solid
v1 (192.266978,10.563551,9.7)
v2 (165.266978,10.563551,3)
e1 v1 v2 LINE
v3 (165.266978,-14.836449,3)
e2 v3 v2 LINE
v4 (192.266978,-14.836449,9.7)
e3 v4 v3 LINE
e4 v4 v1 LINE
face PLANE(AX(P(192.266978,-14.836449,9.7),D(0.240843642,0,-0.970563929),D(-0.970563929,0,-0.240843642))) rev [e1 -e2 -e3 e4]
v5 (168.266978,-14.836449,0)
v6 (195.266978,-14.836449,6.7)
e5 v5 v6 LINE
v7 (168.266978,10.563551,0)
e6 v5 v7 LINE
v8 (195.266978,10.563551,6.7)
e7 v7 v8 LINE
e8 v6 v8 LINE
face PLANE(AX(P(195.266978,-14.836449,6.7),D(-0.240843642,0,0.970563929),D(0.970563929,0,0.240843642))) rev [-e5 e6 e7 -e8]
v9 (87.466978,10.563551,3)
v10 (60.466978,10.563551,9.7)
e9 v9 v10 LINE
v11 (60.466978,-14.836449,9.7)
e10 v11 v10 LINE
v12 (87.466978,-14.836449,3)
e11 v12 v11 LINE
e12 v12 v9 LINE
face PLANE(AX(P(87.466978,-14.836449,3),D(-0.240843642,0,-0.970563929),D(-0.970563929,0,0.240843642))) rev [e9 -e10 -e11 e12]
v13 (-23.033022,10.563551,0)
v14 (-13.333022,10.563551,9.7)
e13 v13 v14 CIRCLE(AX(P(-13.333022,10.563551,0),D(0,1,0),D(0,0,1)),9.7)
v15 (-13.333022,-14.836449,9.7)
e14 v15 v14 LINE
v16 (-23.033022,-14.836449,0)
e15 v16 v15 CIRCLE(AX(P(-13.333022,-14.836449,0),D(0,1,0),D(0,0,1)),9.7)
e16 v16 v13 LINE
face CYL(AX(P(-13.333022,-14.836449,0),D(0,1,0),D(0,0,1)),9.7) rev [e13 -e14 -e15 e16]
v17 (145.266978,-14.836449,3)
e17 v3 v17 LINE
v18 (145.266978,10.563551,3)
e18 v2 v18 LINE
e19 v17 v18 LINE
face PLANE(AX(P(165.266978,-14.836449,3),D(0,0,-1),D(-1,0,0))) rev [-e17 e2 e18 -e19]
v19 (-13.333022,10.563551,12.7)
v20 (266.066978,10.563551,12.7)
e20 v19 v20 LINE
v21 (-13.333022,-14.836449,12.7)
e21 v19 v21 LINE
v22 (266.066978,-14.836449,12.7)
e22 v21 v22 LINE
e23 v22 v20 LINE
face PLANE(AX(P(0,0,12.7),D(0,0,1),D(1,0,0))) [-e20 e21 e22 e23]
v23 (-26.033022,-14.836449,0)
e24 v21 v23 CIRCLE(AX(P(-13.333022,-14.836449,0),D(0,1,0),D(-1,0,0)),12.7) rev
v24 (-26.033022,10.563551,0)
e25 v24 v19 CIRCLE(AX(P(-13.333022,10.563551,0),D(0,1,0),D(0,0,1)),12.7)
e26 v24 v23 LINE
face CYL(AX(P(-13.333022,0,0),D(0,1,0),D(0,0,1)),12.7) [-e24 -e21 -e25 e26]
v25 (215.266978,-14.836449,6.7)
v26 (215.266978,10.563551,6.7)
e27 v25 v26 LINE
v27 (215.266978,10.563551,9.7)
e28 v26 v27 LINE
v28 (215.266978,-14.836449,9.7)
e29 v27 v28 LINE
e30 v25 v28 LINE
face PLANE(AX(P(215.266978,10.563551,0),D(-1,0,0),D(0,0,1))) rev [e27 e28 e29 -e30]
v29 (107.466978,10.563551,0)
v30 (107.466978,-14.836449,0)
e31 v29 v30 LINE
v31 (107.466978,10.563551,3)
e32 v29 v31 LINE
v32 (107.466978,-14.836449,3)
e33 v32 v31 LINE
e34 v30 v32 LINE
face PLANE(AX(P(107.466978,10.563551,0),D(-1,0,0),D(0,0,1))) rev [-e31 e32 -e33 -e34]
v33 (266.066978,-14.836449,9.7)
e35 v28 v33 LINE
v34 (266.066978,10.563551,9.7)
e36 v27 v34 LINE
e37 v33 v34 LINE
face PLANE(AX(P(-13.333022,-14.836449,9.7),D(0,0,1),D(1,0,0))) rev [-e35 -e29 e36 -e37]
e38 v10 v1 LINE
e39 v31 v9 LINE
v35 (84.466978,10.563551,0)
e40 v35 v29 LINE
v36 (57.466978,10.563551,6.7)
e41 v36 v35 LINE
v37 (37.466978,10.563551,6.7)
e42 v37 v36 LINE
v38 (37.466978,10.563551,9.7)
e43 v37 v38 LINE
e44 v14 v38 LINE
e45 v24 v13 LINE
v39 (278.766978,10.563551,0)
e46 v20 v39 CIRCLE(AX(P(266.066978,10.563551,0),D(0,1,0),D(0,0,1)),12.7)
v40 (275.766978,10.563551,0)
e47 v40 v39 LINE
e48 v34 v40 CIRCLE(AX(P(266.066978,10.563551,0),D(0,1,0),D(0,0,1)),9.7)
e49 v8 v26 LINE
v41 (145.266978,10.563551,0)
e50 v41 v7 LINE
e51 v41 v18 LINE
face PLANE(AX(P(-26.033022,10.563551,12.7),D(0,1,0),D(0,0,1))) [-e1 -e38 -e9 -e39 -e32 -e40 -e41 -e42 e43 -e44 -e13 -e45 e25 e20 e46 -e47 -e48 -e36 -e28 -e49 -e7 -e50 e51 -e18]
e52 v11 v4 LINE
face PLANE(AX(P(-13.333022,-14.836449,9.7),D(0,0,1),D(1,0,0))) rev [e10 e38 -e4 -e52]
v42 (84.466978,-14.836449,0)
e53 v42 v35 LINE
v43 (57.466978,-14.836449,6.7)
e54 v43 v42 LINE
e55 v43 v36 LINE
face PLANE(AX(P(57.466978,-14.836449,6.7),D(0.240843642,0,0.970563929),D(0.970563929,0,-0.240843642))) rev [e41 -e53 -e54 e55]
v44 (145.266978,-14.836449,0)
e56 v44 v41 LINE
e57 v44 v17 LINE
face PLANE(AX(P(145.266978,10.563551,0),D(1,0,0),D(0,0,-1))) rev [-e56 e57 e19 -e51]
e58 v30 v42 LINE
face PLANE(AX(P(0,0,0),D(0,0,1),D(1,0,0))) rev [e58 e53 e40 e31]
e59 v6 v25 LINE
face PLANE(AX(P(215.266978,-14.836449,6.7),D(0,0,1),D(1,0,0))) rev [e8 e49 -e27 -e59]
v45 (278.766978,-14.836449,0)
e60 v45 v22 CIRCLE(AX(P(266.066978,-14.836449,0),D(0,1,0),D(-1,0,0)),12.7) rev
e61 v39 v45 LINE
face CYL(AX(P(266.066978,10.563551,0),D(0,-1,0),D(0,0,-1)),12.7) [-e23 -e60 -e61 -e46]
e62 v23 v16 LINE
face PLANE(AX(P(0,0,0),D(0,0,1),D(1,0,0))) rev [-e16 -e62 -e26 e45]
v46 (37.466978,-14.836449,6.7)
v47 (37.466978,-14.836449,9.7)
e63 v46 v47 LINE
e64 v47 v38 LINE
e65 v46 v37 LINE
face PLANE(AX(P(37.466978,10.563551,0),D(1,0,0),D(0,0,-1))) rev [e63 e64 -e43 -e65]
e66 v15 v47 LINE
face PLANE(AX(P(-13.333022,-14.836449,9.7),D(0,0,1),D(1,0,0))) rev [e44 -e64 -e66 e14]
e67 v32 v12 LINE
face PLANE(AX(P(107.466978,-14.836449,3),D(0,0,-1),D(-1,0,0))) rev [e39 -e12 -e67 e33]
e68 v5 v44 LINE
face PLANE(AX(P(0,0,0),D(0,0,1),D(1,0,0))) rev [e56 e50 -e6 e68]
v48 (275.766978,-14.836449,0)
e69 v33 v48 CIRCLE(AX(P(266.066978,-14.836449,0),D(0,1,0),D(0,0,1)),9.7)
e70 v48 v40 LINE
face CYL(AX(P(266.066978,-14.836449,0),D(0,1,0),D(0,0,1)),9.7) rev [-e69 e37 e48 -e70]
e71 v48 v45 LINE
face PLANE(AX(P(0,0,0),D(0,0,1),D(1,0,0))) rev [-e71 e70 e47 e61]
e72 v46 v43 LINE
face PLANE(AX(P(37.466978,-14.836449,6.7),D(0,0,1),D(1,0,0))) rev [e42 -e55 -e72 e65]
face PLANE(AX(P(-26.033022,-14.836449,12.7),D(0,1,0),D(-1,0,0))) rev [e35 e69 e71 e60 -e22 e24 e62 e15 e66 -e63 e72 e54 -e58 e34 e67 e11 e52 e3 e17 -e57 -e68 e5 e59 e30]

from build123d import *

# Parameters (mm, degrees)
SKETCH1_W           = 304.8
SKETCH1_H           = 25.4
BOSS_EXTRUDE2_DEPTH = 12.7
FILLET1_R           = 12.7
CUT_EXTRUDE3_DEPTH  = 281.209703849
SKETCH8_W           = 70
SKETCH8_H           = 25.4
BOSS_EXTRUDE3_DEPTH = 9.7
CUT_EXTRUDE4_DEPTH  = 281.209703849
CUT_EXTRUDE5_DEPTH  = 281.209703849


with BuildPart() as part:
    # Sketch1 → Boss-Extrude2 (new body)
    with BuildSketch(Plane.XY):
        with Locations((126.366978193, -2.136448598)):
            Rectangle(SKETCH1_W, SKETCH1_H)
    extrude(amount=BOSS_EXTRUDE2_DEPTH)

    # Fillet1
    fillet1_edges = [part.edges().sort_by_distance(p)[0] for p in [
        (-26.033021807, -2.136448598, 12.7),
        (278.766978193, -2.136448598, 12.7),
    ]]
    fillet(fillet1_edges, radius=FILLET1_R - 0.0001)  # a hair under: the kernel refuses the full size

    # Sketch6 → Cut-Extrude3 (cut, through all)
    with BuildSketch(Plane(origin=(0, 10.563551402, 0), x_dir=(1, 0, 0), z_dir=(0, 1, 0))):
        with BuildLine():
            Line((-23.033021807, 0), (275.766978193, 0))
            ThreePointArc((275.766978193, 0), (272.925913971, -6.858935778), (266.066978193, -9.7))
            Line((266.066978193, -9.7), (-13.333021807, -9.7))
            ThreePointArc((-13.333021807, -9.7), (-20.191957584, -6.858935778), (-23.033021807, 0))
        make_face()
    extrude(amount=-CUT_EXTRUDE3_DEPTH, mode=Mode.SUBTRACT)

    # Sketch8 → Boss-Extrude3 (add)
    with BuildSketch(Plane(origin=(0, 0, 9.7), x_dir=(-1, 0, 0), z_dir=(0, 0, -1))):
        with Locations((-180.266978193, -2.136448598)):
            Rectangle(SKETCH8_W, SKETCH8_H)
        with Locations((-72.466978193, -2.136448598)):
            Rectangle(SKETCH8_W, SKETCH8_H)
    extrude(amount=BOSS_EXTRUDE3_DEPTH)

    # Sketch9 → Cut-Extrude4 (cut, through all)
    with BuildSketch(Plane(origin=(0, 10.563551402, 0), x_dir=(1, 0, 0), z_dir=(0, 1, 0))):
        Polygon((145.266978193, -9.7), (165.266978193, -9.7), (192.266978193, -9.7), (165.266978193, -3), (145.266978193, -3), align=None)
        Polygon((215.266978193, -6.7), (195.266978193, -6.7), (168.266978193, 0), (215.266978193, 0), align=None)
    extrude(amount=-CUT_EXTRUDE4_DEPTH, mode=Mode.SUBTRACT)

    # Sketch12 → Cut-Extrude5 (cut, through all)
    with BuildSketch(Plane(origin=(0, 10.563551402, 0), x_dir=(1, 0, 0), z_dir=(0, 1, 0))):
        Polygon((107.466978193, -9.7), (107.466978193, -3), (87.466978193, -3), (60.466978193, -9.7), align=None)
        Polygon((37.466978193, -6.7), (57.466978193, -6.7), (84.466978193, 0), (37.466978193, 0), align=None)
    extrude(amount=-CUT_EXTRUDE5_DEPTH, mode=Mode.SUBTRACT)


solid = part.part
